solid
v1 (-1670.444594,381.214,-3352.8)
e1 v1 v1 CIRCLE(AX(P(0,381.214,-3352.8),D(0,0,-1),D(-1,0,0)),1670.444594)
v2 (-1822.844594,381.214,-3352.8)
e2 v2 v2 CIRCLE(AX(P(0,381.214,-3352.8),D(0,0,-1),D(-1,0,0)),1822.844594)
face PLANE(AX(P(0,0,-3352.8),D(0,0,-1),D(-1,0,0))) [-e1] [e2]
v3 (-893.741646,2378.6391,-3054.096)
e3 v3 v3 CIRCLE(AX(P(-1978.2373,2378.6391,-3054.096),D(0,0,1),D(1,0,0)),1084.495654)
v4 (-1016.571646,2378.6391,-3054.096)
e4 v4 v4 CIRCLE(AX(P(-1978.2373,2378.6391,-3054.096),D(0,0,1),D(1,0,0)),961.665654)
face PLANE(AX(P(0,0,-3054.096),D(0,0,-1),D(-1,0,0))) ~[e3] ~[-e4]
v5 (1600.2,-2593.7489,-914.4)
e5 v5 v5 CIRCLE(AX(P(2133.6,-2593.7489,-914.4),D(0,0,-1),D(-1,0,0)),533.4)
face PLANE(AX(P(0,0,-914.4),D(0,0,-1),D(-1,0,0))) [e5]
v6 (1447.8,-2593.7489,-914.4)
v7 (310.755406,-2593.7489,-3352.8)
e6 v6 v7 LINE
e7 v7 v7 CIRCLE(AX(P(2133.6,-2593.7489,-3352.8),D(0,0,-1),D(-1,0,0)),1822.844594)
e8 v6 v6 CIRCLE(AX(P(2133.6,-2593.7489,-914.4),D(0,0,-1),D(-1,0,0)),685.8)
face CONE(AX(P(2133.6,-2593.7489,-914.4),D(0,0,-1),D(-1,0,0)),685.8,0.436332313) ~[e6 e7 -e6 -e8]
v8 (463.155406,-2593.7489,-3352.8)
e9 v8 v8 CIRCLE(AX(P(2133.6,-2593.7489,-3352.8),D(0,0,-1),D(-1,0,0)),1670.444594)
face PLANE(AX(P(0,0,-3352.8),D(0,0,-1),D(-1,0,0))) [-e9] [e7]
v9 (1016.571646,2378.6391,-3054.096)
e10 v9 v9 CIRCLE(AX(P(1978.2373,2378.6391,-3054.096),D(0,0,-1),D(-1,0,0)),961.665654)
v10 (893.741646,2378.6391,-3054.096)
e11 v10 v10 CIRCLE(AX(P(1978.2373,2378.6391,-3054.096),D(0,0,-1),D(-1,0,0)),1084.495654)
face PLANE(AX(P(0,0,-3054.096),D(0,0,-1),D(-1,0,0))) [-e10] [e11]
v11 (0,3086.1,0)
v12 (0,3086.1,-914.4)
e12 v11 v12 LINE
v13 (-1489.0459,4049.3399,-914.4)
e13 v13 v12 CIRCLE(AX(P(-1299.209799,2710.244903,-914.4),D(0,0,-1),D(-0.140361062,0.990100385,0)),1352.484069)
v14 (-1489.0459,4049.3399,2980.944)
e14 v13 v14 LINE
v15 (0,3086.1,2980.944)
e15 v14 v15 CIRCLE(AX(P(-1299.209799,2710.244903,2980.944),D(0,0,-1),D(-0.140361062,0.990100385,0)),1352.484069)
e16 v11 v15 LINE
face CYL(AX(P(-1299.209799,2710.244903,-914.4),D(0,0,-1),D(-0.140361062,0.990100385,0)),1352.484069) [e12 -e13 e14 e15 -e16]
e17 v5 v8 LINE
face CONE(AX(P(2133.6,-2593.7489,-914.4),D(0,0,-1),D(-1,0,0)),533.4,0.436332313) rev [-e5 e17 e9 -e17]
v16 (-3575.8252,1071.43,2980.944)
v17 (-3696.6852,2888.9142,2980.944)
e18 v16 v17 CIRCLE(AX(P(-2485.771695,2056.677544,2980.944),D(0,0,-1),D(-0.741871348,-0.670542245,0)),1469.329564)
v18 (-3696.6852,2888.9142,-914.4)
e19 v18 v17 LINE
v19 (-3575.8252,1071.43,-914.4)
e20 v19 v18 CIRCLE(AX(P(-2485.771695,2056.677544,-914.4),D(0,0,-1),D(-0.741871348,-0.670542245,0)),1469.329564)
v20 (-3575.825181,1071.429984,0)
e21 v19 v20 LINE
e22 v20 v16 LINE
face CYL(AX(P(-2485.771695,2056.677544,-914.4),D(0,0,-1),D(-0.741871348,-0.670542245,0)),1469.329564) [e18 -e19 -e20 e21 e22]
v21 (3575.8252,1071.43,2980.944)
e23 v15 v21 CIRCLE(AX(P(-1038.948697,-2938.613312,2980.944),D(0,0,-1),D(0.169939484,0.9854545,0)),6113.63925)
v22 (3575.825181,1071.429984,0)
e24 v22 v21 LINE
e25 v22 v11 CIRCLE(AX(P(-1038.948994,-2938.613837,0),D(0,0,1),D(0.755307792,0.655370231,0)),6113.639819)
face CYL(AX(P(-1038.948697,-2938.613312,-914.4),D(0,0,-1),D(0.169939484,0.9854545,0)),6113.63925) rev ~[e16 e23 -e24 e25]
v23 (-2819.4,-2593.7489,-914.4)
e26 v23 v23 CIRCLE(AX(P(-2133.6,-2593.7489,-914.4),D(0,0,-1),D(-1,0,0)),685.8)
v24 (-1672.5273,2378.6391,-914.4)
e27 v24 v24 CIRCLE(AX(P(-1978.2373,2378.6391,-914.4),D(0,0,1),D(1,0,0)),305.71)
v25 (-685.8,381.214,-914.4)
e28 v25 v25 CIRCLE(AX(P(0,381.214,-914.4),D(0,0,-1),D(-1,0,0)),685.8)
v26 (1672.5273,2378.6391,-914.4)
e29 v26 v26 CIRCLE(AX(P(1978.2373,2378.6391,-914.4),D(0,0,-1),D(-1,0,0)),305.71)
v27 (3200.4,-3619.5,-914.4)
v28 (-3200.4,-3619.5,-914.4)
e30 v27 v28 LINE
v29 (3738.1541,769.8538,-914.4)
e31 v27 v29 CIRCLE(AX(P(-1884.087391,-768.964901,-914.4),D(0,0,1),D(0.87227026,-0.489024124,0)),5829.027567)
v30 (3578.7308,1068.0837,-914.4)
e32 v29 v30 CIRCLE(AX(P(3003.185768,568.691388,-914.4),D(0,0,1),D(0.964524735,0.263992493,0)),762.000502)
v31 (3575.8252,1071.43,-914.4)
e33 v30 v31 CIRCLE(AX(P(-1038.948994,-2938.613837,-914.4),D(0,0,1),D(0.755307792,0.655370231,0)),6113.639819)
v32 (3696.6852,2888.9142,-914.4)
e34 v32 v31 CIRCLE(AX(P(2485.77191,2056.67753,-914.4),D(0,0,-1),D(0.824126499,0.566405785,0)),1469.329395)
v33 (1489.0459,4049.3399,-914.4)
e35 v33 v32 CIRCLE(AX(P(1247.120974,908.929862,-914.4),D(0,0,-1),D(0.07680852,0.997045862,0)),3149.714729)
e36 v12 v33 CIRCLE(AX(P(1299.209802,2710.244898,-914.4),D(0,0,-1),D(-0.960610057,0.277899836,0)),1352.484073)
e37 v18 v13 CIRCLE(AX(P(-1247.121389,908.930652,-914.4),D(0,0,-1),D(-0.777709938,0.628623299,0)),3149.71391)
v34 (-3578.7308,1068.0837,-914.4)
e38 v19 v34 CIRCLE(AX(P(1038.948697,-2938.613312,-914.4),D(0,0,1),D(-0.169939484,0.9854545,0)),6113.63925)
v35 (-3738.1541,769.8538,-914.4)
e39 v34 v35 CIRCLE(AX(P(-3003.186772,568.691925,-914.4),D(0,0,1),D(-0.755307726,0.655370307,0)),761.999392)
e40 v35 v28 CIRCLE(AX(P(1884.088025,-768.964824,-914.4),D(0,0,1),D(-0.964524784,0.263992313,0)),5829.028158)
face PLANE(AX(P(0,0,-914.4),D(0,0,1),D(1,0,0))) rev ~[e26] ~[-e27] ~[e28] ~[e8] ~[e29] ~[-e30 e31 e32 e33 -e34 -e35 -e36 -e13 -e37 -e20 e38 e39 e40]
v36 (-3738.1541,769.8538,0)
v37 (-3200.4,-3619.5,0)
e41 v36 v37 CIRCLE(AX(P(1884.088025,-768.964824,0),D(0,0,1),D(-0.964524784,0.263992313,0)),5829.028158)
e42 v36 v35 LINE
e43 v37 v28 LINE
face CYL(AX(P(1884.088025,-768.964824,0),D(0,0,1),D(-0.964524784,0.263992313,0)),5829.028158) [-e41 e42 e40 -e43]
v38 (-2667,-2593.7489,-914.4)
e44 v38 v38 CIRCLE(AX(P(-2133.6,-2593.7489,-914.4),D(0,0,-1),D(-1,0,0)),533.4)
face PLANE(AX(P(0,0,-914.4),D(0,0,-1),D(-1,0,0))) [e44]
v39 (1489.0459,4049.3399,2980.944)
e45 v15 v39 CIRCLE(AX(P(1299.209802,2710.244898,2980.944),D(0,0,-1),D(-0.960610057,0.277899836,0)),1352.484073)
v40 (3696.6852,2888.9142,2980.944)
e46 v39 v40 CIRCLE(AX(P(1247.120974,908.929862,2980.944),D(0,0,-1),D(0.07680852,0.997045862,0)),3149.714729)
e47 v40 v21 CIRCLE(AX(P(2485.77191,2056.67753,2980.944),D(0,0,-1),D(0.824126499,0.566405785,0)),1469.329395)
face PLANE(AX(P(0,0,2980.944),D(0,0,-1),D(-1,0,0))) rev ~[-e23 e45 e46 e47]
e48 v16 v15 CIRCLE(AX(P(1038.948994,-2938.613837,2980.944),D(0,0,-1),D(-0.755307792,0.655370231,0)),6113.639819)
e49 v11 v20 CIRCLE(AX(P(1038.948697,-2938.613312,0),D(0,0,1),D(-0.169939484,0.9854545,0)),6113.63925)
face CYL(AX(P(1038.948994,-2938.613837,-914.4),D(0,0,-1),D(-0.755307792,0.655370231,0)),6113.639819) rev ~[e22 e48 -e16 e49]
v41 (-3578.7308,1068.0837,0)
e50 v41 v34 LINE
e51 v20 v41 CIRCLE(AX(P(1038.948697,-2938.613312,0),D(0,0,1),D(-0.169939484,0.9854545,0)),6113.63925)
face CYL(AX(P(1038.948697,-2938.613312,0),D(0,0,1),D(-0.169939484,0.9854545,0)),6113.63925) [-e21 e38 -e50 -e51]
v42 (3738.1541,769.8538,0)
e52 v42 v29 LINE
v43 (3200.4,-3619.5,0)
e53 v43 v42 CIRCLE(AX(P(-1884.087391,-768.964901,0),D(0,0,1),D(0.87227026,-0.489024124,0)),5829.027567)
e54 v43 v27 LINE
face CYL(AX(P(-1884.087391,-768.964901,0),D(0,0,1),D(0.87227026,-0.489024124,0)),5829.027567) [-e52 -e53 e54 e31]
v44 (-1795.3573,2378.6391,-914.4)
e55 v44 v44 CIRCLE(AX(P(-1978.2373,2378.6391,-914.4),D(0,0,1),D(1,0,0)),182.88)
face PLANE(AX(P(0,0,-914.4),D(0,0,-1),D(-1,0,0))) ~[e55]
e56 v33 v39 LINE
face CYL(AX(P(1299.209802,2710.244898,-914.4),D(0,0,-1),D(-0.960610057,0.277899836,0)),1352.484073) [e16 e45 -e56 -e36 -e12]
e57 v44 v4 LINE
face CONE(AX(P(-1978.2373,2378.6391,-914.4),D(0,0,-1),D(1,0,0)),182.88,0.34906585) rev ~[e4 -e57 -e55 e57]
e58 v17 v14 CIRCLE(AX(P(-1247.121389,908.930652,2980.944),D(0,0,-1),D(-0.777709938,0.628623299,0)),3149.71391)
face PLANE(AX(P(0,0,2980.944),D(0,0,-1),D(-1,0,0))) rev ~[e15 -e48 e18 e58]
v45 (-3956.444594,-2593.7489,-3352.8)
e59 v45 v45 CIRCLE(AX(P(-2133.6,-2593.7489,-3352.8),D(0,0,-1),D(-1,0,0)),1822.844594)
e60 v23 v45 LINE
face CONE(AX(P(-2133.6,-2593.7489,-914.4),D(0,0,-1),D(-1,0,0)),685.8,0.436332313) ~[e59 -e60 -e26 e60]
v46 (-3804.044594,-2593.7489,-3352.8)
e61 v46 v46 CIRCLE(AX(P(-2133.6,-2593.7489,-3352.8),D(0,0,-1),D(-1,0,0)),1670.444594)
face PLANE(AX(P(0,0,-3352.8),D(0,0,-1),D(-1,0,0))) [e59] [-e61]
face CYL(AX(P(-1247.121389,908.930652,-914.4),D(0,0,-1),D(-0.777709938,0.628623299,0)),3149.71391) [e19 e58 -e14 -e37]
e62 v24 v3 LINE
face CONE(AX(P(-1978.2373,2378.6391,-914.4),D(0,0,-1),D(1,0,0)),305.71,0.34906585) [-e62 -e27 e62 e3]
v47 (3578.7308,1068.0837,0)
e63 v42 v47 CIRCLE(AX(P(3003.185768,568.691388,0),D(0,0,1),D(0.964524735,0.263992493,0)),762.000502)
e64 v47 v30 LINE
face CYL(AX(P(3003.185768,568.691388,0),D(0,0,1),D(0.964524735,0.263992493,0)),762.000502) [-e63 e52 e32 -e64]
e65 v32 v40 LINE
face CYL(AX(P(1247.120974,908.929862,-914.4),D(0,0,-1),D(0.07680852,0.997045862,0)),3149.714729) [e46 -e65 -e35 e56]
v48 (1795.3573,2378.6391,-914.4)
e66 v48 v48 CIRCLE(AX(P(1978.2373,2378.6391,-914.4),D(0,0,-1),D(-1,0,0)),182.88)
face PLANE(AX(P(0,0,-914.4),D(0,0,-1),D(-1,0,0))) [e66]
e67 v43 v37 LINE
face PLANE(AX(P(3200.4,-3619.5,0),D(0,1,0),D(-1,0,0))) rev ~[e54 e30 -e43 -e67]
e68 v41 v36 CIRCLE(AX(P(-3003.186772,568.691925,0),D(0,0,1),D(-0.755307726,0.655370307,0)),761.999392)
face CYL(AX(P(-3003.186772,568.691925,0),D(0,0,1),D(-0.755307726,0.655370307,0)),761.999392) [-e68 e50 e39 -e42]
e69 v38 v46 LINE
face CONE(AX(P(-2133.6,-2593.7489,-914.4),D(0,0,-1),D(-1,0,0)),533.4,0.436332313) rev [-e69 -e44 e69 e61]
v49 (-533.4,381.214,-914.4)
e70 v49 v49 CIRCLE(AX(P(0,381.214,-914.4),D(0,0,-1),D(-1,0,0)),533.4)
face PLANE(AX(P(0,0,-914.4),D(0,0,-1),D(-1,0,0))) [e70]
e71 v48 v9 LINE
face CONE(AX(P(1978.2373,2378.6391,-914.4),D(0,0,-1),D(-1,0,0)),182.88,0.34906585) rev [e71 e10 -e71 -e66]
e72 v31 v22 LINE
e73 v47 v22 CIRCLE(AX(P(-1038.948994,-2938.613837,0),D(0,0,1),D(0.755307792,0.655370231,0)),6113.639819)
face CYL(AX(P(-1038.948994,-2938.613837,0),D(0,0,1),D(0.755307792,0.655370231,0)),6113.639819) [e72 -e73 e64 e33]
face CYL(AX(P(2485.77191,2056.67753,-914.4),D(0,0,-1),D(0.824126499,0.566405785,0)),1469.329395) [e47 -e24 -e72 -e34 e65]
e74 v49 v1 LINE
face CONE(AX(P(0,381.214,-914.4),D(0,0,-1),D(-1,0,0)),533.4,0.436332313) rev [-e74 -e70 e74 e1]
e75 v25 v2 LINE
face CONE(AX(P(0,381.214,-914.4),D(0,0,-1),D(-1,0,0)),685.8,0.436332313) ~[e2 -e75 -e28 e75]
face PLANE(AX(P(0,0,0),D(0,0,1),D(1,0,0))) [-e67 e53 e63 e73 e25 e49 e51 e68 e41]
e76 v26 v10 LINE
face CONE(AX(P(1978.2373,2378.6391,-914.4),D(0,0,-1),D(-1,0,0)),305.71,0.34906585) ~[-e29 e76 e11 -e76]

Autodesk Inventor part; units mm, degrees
ref_plane "YZ Plane" through (0, 0, 0) normal (1, 0, 0) x (0, 1, 0)
ref_plane "XZ Plane" through (0, 0, 0) normal (0, 1, 0) x (-1, 0, 0)
ref_plane "XY Plane" through (0, 0, 0) normal (0, 0, 1) x (1, 0, 0)
sketch "Sketch3" plane through (0, 0, 0) normal (0, 0, 1) x (1, 0, 0)
  line L0 (3200.4, -3619.5) -> (-3200.4, -3619.5)
  line L1 (0, -3619.5) -> (0, 3086.1) construction
  arc A0 (-3738.1541, 769.8538) -> (-3200.4, -3619.5) centre (1884.0877, -768.9648) ccw
  arc A1 (0, 3086.1) -> (-3578.7308, 1068.0837) centre (1038.9488, -2938.6136) ccw
  arc A2 (-3578.7308, 1068.0837) -> (-3738.1541, 769.8538) centre (-3003.1863, 568.6916) ccw
  arc A3 (3200.4, -3619.5) -> (3738.1541, 769.8538) centre (-1884.0877, -768.9648) ccw
  arc A4 (3578.7308, 1068.0837) -> (0, 3086.1) centre (-1038.9488, -2938.6136) ccw
  arc A5 (3738.1541, 769.8538) -> (3578.7308, 1068.0837) centre (3003.1863, 568.6916) ccw
  arc A6 (-3278.4432, 715.8952) -> (-2925.1203, -3162.3) centre (1884.0877, -768.9648) ccw
  line L2 (-2925.1203, -3162.3) -> (2925.1203, -3162.3)
  arc A7 (2925.1203, -3162.3) -> (3278.4432, 715.8952) centre (-1884.0877, -768.9648) ccw
  arc A8 (3278.4432, 715.8952) -> (0, 2621.5927) centre (-1038.9488, -2938.6136) ccw
  arc A9 (0, 2621.5927) -> (-3278.4432, 715.8952) centre (1038.9488, -2938.6136) ccw
  dimension "d3" = 6400.8
  dimension "d4" = 6705.6
  dimension "d5" = 762
  dimension "d6" = 457.2
extrude "Extrusion9" add sketch "Sketch3" against normal blind 914.4 contours L0 A0 A2 A1 A4 A5 A3 | A9 A8 A7 L2 A6
sketch "Sketch14" plane through (0, 0, -914.4) normal (0, 0, -1) x (-1, 0, 0)
  line L0 (0, 3086.1) -> (0, -4176.5904) construction
  arc A0 (-3696.6852, 2888.9142) -> (-3575.8252, 1071.43) centre (-2485.7718, 2056.6775) ccw
  arc A1 (0, 3086.1) -> (-1489.0459, 4049.3399) centre (-1299.2098, 2710.2449) ccw
  arc A2 (-1489.0459, 4049.3399) -> (-3696.6852, 2888.9142) centre (-1247.1211, 908.9303) ccw
  arc A3 (3575.8252, 1071.43) -> (3696.6852, 2888.9142) centre (2485.7718, 2056.6775) ccw
  arc A4 (1489.0459, 4049.3399) -> (0, 3086.1) centre (1299.2098, 2710.2449) ccw
  arc A5 (3696.6852, 2888.9142) -> (1489.0459, 4049.3399) centre (1247.1211, 908.9303) ccw
  arc A6 (3578.7308, 1068.0837) -> (0, 3086.1) centre (-1038.9488, -2938.6136) ccw projected
  arc A7 (3578.7308, 1068.0837) -> (0, 3086.1) centre (-1038.9488, -2938.6136) ccw
  arc A8 (0, 3086.1) -> (-3578.7308, 1068.0837) centre (1038.9488, -2938.6136) ccw projected
  arc A9 (-3578.7308, 1068.0837) -> (-3738.1541, 769.8538) centre (-3003.1863, 568.6916) ccw projected
  arc A10 (0, 3086.1) -> (-3578.7308, 1068.0837) centre (1038.9488, -2938.6136) ccw
extrude "Extrusion11" add sketch "Sketch14" against normal blind 3895.344
sketch "Sketch15" plane through (0, 0, -914.4) normal (0, 0, -1) x (-1, 0, 0)
  circle A0 centre (-1978.2373, 2378.6391) radius 305.71
  circle A1 centre (-1978.2373, 2378.6391) radius 182.88
  point P0 (0, 0)
  dimension "d61" = 611.42
  dimension "d63" = 365.76
extrude "Extrusion12" add sketch "Sketch15" along normal blind 2139.696 draft 20 contours A0 | A1
extrude "Extrusion13" cut sketch "Sketch15" along normal blind 2139.696 draft 20 contours A1
mirror "Mirror2" about plane through (0, 0, 0) normal (1, 0, 0) of "Extrusion12", "Extrusion13"
sketch "Sketch17" plane through (0, 0, -914.4) normal (0, 0, -1) x (-1, 0, 0)
  circle A0 centre (0, 381.214) radius 685.8
  circle A1 centre (-2133.6, -2593.7489) radius 685.8
  circle A2 centre (2133.6, -2593.7489) radius 685.8
  circle A3 centre (0, 381.214) radius 533.4
  circle A4 centre (2133.6, -2593.7489) radius 533.4
  circle A5 centre (-2133.6, -2593.7489) radius 533.4
  point P0 (0, 0)
  dimension "d74" = 1371.6
  dimension "d75" = 1371.6
  dimension "d76" = 1371.6
  dimension "d79" = 1066.8
  dimension "d80" = 1066.8
  dimension "d81" = 1066.8
extrude "Extrusion14" add sketch "Sketch17" along normal blind 2438.4 draft 25 contours A0 | A1 | A2 | A3 | A4 | A5
extrude "Extrusion15" cut sketch "Sketch17" along normal blind 2438.4 draft 25 contours A3 | A4 | A5
properties part number "engines" material "Steel, Mild"
